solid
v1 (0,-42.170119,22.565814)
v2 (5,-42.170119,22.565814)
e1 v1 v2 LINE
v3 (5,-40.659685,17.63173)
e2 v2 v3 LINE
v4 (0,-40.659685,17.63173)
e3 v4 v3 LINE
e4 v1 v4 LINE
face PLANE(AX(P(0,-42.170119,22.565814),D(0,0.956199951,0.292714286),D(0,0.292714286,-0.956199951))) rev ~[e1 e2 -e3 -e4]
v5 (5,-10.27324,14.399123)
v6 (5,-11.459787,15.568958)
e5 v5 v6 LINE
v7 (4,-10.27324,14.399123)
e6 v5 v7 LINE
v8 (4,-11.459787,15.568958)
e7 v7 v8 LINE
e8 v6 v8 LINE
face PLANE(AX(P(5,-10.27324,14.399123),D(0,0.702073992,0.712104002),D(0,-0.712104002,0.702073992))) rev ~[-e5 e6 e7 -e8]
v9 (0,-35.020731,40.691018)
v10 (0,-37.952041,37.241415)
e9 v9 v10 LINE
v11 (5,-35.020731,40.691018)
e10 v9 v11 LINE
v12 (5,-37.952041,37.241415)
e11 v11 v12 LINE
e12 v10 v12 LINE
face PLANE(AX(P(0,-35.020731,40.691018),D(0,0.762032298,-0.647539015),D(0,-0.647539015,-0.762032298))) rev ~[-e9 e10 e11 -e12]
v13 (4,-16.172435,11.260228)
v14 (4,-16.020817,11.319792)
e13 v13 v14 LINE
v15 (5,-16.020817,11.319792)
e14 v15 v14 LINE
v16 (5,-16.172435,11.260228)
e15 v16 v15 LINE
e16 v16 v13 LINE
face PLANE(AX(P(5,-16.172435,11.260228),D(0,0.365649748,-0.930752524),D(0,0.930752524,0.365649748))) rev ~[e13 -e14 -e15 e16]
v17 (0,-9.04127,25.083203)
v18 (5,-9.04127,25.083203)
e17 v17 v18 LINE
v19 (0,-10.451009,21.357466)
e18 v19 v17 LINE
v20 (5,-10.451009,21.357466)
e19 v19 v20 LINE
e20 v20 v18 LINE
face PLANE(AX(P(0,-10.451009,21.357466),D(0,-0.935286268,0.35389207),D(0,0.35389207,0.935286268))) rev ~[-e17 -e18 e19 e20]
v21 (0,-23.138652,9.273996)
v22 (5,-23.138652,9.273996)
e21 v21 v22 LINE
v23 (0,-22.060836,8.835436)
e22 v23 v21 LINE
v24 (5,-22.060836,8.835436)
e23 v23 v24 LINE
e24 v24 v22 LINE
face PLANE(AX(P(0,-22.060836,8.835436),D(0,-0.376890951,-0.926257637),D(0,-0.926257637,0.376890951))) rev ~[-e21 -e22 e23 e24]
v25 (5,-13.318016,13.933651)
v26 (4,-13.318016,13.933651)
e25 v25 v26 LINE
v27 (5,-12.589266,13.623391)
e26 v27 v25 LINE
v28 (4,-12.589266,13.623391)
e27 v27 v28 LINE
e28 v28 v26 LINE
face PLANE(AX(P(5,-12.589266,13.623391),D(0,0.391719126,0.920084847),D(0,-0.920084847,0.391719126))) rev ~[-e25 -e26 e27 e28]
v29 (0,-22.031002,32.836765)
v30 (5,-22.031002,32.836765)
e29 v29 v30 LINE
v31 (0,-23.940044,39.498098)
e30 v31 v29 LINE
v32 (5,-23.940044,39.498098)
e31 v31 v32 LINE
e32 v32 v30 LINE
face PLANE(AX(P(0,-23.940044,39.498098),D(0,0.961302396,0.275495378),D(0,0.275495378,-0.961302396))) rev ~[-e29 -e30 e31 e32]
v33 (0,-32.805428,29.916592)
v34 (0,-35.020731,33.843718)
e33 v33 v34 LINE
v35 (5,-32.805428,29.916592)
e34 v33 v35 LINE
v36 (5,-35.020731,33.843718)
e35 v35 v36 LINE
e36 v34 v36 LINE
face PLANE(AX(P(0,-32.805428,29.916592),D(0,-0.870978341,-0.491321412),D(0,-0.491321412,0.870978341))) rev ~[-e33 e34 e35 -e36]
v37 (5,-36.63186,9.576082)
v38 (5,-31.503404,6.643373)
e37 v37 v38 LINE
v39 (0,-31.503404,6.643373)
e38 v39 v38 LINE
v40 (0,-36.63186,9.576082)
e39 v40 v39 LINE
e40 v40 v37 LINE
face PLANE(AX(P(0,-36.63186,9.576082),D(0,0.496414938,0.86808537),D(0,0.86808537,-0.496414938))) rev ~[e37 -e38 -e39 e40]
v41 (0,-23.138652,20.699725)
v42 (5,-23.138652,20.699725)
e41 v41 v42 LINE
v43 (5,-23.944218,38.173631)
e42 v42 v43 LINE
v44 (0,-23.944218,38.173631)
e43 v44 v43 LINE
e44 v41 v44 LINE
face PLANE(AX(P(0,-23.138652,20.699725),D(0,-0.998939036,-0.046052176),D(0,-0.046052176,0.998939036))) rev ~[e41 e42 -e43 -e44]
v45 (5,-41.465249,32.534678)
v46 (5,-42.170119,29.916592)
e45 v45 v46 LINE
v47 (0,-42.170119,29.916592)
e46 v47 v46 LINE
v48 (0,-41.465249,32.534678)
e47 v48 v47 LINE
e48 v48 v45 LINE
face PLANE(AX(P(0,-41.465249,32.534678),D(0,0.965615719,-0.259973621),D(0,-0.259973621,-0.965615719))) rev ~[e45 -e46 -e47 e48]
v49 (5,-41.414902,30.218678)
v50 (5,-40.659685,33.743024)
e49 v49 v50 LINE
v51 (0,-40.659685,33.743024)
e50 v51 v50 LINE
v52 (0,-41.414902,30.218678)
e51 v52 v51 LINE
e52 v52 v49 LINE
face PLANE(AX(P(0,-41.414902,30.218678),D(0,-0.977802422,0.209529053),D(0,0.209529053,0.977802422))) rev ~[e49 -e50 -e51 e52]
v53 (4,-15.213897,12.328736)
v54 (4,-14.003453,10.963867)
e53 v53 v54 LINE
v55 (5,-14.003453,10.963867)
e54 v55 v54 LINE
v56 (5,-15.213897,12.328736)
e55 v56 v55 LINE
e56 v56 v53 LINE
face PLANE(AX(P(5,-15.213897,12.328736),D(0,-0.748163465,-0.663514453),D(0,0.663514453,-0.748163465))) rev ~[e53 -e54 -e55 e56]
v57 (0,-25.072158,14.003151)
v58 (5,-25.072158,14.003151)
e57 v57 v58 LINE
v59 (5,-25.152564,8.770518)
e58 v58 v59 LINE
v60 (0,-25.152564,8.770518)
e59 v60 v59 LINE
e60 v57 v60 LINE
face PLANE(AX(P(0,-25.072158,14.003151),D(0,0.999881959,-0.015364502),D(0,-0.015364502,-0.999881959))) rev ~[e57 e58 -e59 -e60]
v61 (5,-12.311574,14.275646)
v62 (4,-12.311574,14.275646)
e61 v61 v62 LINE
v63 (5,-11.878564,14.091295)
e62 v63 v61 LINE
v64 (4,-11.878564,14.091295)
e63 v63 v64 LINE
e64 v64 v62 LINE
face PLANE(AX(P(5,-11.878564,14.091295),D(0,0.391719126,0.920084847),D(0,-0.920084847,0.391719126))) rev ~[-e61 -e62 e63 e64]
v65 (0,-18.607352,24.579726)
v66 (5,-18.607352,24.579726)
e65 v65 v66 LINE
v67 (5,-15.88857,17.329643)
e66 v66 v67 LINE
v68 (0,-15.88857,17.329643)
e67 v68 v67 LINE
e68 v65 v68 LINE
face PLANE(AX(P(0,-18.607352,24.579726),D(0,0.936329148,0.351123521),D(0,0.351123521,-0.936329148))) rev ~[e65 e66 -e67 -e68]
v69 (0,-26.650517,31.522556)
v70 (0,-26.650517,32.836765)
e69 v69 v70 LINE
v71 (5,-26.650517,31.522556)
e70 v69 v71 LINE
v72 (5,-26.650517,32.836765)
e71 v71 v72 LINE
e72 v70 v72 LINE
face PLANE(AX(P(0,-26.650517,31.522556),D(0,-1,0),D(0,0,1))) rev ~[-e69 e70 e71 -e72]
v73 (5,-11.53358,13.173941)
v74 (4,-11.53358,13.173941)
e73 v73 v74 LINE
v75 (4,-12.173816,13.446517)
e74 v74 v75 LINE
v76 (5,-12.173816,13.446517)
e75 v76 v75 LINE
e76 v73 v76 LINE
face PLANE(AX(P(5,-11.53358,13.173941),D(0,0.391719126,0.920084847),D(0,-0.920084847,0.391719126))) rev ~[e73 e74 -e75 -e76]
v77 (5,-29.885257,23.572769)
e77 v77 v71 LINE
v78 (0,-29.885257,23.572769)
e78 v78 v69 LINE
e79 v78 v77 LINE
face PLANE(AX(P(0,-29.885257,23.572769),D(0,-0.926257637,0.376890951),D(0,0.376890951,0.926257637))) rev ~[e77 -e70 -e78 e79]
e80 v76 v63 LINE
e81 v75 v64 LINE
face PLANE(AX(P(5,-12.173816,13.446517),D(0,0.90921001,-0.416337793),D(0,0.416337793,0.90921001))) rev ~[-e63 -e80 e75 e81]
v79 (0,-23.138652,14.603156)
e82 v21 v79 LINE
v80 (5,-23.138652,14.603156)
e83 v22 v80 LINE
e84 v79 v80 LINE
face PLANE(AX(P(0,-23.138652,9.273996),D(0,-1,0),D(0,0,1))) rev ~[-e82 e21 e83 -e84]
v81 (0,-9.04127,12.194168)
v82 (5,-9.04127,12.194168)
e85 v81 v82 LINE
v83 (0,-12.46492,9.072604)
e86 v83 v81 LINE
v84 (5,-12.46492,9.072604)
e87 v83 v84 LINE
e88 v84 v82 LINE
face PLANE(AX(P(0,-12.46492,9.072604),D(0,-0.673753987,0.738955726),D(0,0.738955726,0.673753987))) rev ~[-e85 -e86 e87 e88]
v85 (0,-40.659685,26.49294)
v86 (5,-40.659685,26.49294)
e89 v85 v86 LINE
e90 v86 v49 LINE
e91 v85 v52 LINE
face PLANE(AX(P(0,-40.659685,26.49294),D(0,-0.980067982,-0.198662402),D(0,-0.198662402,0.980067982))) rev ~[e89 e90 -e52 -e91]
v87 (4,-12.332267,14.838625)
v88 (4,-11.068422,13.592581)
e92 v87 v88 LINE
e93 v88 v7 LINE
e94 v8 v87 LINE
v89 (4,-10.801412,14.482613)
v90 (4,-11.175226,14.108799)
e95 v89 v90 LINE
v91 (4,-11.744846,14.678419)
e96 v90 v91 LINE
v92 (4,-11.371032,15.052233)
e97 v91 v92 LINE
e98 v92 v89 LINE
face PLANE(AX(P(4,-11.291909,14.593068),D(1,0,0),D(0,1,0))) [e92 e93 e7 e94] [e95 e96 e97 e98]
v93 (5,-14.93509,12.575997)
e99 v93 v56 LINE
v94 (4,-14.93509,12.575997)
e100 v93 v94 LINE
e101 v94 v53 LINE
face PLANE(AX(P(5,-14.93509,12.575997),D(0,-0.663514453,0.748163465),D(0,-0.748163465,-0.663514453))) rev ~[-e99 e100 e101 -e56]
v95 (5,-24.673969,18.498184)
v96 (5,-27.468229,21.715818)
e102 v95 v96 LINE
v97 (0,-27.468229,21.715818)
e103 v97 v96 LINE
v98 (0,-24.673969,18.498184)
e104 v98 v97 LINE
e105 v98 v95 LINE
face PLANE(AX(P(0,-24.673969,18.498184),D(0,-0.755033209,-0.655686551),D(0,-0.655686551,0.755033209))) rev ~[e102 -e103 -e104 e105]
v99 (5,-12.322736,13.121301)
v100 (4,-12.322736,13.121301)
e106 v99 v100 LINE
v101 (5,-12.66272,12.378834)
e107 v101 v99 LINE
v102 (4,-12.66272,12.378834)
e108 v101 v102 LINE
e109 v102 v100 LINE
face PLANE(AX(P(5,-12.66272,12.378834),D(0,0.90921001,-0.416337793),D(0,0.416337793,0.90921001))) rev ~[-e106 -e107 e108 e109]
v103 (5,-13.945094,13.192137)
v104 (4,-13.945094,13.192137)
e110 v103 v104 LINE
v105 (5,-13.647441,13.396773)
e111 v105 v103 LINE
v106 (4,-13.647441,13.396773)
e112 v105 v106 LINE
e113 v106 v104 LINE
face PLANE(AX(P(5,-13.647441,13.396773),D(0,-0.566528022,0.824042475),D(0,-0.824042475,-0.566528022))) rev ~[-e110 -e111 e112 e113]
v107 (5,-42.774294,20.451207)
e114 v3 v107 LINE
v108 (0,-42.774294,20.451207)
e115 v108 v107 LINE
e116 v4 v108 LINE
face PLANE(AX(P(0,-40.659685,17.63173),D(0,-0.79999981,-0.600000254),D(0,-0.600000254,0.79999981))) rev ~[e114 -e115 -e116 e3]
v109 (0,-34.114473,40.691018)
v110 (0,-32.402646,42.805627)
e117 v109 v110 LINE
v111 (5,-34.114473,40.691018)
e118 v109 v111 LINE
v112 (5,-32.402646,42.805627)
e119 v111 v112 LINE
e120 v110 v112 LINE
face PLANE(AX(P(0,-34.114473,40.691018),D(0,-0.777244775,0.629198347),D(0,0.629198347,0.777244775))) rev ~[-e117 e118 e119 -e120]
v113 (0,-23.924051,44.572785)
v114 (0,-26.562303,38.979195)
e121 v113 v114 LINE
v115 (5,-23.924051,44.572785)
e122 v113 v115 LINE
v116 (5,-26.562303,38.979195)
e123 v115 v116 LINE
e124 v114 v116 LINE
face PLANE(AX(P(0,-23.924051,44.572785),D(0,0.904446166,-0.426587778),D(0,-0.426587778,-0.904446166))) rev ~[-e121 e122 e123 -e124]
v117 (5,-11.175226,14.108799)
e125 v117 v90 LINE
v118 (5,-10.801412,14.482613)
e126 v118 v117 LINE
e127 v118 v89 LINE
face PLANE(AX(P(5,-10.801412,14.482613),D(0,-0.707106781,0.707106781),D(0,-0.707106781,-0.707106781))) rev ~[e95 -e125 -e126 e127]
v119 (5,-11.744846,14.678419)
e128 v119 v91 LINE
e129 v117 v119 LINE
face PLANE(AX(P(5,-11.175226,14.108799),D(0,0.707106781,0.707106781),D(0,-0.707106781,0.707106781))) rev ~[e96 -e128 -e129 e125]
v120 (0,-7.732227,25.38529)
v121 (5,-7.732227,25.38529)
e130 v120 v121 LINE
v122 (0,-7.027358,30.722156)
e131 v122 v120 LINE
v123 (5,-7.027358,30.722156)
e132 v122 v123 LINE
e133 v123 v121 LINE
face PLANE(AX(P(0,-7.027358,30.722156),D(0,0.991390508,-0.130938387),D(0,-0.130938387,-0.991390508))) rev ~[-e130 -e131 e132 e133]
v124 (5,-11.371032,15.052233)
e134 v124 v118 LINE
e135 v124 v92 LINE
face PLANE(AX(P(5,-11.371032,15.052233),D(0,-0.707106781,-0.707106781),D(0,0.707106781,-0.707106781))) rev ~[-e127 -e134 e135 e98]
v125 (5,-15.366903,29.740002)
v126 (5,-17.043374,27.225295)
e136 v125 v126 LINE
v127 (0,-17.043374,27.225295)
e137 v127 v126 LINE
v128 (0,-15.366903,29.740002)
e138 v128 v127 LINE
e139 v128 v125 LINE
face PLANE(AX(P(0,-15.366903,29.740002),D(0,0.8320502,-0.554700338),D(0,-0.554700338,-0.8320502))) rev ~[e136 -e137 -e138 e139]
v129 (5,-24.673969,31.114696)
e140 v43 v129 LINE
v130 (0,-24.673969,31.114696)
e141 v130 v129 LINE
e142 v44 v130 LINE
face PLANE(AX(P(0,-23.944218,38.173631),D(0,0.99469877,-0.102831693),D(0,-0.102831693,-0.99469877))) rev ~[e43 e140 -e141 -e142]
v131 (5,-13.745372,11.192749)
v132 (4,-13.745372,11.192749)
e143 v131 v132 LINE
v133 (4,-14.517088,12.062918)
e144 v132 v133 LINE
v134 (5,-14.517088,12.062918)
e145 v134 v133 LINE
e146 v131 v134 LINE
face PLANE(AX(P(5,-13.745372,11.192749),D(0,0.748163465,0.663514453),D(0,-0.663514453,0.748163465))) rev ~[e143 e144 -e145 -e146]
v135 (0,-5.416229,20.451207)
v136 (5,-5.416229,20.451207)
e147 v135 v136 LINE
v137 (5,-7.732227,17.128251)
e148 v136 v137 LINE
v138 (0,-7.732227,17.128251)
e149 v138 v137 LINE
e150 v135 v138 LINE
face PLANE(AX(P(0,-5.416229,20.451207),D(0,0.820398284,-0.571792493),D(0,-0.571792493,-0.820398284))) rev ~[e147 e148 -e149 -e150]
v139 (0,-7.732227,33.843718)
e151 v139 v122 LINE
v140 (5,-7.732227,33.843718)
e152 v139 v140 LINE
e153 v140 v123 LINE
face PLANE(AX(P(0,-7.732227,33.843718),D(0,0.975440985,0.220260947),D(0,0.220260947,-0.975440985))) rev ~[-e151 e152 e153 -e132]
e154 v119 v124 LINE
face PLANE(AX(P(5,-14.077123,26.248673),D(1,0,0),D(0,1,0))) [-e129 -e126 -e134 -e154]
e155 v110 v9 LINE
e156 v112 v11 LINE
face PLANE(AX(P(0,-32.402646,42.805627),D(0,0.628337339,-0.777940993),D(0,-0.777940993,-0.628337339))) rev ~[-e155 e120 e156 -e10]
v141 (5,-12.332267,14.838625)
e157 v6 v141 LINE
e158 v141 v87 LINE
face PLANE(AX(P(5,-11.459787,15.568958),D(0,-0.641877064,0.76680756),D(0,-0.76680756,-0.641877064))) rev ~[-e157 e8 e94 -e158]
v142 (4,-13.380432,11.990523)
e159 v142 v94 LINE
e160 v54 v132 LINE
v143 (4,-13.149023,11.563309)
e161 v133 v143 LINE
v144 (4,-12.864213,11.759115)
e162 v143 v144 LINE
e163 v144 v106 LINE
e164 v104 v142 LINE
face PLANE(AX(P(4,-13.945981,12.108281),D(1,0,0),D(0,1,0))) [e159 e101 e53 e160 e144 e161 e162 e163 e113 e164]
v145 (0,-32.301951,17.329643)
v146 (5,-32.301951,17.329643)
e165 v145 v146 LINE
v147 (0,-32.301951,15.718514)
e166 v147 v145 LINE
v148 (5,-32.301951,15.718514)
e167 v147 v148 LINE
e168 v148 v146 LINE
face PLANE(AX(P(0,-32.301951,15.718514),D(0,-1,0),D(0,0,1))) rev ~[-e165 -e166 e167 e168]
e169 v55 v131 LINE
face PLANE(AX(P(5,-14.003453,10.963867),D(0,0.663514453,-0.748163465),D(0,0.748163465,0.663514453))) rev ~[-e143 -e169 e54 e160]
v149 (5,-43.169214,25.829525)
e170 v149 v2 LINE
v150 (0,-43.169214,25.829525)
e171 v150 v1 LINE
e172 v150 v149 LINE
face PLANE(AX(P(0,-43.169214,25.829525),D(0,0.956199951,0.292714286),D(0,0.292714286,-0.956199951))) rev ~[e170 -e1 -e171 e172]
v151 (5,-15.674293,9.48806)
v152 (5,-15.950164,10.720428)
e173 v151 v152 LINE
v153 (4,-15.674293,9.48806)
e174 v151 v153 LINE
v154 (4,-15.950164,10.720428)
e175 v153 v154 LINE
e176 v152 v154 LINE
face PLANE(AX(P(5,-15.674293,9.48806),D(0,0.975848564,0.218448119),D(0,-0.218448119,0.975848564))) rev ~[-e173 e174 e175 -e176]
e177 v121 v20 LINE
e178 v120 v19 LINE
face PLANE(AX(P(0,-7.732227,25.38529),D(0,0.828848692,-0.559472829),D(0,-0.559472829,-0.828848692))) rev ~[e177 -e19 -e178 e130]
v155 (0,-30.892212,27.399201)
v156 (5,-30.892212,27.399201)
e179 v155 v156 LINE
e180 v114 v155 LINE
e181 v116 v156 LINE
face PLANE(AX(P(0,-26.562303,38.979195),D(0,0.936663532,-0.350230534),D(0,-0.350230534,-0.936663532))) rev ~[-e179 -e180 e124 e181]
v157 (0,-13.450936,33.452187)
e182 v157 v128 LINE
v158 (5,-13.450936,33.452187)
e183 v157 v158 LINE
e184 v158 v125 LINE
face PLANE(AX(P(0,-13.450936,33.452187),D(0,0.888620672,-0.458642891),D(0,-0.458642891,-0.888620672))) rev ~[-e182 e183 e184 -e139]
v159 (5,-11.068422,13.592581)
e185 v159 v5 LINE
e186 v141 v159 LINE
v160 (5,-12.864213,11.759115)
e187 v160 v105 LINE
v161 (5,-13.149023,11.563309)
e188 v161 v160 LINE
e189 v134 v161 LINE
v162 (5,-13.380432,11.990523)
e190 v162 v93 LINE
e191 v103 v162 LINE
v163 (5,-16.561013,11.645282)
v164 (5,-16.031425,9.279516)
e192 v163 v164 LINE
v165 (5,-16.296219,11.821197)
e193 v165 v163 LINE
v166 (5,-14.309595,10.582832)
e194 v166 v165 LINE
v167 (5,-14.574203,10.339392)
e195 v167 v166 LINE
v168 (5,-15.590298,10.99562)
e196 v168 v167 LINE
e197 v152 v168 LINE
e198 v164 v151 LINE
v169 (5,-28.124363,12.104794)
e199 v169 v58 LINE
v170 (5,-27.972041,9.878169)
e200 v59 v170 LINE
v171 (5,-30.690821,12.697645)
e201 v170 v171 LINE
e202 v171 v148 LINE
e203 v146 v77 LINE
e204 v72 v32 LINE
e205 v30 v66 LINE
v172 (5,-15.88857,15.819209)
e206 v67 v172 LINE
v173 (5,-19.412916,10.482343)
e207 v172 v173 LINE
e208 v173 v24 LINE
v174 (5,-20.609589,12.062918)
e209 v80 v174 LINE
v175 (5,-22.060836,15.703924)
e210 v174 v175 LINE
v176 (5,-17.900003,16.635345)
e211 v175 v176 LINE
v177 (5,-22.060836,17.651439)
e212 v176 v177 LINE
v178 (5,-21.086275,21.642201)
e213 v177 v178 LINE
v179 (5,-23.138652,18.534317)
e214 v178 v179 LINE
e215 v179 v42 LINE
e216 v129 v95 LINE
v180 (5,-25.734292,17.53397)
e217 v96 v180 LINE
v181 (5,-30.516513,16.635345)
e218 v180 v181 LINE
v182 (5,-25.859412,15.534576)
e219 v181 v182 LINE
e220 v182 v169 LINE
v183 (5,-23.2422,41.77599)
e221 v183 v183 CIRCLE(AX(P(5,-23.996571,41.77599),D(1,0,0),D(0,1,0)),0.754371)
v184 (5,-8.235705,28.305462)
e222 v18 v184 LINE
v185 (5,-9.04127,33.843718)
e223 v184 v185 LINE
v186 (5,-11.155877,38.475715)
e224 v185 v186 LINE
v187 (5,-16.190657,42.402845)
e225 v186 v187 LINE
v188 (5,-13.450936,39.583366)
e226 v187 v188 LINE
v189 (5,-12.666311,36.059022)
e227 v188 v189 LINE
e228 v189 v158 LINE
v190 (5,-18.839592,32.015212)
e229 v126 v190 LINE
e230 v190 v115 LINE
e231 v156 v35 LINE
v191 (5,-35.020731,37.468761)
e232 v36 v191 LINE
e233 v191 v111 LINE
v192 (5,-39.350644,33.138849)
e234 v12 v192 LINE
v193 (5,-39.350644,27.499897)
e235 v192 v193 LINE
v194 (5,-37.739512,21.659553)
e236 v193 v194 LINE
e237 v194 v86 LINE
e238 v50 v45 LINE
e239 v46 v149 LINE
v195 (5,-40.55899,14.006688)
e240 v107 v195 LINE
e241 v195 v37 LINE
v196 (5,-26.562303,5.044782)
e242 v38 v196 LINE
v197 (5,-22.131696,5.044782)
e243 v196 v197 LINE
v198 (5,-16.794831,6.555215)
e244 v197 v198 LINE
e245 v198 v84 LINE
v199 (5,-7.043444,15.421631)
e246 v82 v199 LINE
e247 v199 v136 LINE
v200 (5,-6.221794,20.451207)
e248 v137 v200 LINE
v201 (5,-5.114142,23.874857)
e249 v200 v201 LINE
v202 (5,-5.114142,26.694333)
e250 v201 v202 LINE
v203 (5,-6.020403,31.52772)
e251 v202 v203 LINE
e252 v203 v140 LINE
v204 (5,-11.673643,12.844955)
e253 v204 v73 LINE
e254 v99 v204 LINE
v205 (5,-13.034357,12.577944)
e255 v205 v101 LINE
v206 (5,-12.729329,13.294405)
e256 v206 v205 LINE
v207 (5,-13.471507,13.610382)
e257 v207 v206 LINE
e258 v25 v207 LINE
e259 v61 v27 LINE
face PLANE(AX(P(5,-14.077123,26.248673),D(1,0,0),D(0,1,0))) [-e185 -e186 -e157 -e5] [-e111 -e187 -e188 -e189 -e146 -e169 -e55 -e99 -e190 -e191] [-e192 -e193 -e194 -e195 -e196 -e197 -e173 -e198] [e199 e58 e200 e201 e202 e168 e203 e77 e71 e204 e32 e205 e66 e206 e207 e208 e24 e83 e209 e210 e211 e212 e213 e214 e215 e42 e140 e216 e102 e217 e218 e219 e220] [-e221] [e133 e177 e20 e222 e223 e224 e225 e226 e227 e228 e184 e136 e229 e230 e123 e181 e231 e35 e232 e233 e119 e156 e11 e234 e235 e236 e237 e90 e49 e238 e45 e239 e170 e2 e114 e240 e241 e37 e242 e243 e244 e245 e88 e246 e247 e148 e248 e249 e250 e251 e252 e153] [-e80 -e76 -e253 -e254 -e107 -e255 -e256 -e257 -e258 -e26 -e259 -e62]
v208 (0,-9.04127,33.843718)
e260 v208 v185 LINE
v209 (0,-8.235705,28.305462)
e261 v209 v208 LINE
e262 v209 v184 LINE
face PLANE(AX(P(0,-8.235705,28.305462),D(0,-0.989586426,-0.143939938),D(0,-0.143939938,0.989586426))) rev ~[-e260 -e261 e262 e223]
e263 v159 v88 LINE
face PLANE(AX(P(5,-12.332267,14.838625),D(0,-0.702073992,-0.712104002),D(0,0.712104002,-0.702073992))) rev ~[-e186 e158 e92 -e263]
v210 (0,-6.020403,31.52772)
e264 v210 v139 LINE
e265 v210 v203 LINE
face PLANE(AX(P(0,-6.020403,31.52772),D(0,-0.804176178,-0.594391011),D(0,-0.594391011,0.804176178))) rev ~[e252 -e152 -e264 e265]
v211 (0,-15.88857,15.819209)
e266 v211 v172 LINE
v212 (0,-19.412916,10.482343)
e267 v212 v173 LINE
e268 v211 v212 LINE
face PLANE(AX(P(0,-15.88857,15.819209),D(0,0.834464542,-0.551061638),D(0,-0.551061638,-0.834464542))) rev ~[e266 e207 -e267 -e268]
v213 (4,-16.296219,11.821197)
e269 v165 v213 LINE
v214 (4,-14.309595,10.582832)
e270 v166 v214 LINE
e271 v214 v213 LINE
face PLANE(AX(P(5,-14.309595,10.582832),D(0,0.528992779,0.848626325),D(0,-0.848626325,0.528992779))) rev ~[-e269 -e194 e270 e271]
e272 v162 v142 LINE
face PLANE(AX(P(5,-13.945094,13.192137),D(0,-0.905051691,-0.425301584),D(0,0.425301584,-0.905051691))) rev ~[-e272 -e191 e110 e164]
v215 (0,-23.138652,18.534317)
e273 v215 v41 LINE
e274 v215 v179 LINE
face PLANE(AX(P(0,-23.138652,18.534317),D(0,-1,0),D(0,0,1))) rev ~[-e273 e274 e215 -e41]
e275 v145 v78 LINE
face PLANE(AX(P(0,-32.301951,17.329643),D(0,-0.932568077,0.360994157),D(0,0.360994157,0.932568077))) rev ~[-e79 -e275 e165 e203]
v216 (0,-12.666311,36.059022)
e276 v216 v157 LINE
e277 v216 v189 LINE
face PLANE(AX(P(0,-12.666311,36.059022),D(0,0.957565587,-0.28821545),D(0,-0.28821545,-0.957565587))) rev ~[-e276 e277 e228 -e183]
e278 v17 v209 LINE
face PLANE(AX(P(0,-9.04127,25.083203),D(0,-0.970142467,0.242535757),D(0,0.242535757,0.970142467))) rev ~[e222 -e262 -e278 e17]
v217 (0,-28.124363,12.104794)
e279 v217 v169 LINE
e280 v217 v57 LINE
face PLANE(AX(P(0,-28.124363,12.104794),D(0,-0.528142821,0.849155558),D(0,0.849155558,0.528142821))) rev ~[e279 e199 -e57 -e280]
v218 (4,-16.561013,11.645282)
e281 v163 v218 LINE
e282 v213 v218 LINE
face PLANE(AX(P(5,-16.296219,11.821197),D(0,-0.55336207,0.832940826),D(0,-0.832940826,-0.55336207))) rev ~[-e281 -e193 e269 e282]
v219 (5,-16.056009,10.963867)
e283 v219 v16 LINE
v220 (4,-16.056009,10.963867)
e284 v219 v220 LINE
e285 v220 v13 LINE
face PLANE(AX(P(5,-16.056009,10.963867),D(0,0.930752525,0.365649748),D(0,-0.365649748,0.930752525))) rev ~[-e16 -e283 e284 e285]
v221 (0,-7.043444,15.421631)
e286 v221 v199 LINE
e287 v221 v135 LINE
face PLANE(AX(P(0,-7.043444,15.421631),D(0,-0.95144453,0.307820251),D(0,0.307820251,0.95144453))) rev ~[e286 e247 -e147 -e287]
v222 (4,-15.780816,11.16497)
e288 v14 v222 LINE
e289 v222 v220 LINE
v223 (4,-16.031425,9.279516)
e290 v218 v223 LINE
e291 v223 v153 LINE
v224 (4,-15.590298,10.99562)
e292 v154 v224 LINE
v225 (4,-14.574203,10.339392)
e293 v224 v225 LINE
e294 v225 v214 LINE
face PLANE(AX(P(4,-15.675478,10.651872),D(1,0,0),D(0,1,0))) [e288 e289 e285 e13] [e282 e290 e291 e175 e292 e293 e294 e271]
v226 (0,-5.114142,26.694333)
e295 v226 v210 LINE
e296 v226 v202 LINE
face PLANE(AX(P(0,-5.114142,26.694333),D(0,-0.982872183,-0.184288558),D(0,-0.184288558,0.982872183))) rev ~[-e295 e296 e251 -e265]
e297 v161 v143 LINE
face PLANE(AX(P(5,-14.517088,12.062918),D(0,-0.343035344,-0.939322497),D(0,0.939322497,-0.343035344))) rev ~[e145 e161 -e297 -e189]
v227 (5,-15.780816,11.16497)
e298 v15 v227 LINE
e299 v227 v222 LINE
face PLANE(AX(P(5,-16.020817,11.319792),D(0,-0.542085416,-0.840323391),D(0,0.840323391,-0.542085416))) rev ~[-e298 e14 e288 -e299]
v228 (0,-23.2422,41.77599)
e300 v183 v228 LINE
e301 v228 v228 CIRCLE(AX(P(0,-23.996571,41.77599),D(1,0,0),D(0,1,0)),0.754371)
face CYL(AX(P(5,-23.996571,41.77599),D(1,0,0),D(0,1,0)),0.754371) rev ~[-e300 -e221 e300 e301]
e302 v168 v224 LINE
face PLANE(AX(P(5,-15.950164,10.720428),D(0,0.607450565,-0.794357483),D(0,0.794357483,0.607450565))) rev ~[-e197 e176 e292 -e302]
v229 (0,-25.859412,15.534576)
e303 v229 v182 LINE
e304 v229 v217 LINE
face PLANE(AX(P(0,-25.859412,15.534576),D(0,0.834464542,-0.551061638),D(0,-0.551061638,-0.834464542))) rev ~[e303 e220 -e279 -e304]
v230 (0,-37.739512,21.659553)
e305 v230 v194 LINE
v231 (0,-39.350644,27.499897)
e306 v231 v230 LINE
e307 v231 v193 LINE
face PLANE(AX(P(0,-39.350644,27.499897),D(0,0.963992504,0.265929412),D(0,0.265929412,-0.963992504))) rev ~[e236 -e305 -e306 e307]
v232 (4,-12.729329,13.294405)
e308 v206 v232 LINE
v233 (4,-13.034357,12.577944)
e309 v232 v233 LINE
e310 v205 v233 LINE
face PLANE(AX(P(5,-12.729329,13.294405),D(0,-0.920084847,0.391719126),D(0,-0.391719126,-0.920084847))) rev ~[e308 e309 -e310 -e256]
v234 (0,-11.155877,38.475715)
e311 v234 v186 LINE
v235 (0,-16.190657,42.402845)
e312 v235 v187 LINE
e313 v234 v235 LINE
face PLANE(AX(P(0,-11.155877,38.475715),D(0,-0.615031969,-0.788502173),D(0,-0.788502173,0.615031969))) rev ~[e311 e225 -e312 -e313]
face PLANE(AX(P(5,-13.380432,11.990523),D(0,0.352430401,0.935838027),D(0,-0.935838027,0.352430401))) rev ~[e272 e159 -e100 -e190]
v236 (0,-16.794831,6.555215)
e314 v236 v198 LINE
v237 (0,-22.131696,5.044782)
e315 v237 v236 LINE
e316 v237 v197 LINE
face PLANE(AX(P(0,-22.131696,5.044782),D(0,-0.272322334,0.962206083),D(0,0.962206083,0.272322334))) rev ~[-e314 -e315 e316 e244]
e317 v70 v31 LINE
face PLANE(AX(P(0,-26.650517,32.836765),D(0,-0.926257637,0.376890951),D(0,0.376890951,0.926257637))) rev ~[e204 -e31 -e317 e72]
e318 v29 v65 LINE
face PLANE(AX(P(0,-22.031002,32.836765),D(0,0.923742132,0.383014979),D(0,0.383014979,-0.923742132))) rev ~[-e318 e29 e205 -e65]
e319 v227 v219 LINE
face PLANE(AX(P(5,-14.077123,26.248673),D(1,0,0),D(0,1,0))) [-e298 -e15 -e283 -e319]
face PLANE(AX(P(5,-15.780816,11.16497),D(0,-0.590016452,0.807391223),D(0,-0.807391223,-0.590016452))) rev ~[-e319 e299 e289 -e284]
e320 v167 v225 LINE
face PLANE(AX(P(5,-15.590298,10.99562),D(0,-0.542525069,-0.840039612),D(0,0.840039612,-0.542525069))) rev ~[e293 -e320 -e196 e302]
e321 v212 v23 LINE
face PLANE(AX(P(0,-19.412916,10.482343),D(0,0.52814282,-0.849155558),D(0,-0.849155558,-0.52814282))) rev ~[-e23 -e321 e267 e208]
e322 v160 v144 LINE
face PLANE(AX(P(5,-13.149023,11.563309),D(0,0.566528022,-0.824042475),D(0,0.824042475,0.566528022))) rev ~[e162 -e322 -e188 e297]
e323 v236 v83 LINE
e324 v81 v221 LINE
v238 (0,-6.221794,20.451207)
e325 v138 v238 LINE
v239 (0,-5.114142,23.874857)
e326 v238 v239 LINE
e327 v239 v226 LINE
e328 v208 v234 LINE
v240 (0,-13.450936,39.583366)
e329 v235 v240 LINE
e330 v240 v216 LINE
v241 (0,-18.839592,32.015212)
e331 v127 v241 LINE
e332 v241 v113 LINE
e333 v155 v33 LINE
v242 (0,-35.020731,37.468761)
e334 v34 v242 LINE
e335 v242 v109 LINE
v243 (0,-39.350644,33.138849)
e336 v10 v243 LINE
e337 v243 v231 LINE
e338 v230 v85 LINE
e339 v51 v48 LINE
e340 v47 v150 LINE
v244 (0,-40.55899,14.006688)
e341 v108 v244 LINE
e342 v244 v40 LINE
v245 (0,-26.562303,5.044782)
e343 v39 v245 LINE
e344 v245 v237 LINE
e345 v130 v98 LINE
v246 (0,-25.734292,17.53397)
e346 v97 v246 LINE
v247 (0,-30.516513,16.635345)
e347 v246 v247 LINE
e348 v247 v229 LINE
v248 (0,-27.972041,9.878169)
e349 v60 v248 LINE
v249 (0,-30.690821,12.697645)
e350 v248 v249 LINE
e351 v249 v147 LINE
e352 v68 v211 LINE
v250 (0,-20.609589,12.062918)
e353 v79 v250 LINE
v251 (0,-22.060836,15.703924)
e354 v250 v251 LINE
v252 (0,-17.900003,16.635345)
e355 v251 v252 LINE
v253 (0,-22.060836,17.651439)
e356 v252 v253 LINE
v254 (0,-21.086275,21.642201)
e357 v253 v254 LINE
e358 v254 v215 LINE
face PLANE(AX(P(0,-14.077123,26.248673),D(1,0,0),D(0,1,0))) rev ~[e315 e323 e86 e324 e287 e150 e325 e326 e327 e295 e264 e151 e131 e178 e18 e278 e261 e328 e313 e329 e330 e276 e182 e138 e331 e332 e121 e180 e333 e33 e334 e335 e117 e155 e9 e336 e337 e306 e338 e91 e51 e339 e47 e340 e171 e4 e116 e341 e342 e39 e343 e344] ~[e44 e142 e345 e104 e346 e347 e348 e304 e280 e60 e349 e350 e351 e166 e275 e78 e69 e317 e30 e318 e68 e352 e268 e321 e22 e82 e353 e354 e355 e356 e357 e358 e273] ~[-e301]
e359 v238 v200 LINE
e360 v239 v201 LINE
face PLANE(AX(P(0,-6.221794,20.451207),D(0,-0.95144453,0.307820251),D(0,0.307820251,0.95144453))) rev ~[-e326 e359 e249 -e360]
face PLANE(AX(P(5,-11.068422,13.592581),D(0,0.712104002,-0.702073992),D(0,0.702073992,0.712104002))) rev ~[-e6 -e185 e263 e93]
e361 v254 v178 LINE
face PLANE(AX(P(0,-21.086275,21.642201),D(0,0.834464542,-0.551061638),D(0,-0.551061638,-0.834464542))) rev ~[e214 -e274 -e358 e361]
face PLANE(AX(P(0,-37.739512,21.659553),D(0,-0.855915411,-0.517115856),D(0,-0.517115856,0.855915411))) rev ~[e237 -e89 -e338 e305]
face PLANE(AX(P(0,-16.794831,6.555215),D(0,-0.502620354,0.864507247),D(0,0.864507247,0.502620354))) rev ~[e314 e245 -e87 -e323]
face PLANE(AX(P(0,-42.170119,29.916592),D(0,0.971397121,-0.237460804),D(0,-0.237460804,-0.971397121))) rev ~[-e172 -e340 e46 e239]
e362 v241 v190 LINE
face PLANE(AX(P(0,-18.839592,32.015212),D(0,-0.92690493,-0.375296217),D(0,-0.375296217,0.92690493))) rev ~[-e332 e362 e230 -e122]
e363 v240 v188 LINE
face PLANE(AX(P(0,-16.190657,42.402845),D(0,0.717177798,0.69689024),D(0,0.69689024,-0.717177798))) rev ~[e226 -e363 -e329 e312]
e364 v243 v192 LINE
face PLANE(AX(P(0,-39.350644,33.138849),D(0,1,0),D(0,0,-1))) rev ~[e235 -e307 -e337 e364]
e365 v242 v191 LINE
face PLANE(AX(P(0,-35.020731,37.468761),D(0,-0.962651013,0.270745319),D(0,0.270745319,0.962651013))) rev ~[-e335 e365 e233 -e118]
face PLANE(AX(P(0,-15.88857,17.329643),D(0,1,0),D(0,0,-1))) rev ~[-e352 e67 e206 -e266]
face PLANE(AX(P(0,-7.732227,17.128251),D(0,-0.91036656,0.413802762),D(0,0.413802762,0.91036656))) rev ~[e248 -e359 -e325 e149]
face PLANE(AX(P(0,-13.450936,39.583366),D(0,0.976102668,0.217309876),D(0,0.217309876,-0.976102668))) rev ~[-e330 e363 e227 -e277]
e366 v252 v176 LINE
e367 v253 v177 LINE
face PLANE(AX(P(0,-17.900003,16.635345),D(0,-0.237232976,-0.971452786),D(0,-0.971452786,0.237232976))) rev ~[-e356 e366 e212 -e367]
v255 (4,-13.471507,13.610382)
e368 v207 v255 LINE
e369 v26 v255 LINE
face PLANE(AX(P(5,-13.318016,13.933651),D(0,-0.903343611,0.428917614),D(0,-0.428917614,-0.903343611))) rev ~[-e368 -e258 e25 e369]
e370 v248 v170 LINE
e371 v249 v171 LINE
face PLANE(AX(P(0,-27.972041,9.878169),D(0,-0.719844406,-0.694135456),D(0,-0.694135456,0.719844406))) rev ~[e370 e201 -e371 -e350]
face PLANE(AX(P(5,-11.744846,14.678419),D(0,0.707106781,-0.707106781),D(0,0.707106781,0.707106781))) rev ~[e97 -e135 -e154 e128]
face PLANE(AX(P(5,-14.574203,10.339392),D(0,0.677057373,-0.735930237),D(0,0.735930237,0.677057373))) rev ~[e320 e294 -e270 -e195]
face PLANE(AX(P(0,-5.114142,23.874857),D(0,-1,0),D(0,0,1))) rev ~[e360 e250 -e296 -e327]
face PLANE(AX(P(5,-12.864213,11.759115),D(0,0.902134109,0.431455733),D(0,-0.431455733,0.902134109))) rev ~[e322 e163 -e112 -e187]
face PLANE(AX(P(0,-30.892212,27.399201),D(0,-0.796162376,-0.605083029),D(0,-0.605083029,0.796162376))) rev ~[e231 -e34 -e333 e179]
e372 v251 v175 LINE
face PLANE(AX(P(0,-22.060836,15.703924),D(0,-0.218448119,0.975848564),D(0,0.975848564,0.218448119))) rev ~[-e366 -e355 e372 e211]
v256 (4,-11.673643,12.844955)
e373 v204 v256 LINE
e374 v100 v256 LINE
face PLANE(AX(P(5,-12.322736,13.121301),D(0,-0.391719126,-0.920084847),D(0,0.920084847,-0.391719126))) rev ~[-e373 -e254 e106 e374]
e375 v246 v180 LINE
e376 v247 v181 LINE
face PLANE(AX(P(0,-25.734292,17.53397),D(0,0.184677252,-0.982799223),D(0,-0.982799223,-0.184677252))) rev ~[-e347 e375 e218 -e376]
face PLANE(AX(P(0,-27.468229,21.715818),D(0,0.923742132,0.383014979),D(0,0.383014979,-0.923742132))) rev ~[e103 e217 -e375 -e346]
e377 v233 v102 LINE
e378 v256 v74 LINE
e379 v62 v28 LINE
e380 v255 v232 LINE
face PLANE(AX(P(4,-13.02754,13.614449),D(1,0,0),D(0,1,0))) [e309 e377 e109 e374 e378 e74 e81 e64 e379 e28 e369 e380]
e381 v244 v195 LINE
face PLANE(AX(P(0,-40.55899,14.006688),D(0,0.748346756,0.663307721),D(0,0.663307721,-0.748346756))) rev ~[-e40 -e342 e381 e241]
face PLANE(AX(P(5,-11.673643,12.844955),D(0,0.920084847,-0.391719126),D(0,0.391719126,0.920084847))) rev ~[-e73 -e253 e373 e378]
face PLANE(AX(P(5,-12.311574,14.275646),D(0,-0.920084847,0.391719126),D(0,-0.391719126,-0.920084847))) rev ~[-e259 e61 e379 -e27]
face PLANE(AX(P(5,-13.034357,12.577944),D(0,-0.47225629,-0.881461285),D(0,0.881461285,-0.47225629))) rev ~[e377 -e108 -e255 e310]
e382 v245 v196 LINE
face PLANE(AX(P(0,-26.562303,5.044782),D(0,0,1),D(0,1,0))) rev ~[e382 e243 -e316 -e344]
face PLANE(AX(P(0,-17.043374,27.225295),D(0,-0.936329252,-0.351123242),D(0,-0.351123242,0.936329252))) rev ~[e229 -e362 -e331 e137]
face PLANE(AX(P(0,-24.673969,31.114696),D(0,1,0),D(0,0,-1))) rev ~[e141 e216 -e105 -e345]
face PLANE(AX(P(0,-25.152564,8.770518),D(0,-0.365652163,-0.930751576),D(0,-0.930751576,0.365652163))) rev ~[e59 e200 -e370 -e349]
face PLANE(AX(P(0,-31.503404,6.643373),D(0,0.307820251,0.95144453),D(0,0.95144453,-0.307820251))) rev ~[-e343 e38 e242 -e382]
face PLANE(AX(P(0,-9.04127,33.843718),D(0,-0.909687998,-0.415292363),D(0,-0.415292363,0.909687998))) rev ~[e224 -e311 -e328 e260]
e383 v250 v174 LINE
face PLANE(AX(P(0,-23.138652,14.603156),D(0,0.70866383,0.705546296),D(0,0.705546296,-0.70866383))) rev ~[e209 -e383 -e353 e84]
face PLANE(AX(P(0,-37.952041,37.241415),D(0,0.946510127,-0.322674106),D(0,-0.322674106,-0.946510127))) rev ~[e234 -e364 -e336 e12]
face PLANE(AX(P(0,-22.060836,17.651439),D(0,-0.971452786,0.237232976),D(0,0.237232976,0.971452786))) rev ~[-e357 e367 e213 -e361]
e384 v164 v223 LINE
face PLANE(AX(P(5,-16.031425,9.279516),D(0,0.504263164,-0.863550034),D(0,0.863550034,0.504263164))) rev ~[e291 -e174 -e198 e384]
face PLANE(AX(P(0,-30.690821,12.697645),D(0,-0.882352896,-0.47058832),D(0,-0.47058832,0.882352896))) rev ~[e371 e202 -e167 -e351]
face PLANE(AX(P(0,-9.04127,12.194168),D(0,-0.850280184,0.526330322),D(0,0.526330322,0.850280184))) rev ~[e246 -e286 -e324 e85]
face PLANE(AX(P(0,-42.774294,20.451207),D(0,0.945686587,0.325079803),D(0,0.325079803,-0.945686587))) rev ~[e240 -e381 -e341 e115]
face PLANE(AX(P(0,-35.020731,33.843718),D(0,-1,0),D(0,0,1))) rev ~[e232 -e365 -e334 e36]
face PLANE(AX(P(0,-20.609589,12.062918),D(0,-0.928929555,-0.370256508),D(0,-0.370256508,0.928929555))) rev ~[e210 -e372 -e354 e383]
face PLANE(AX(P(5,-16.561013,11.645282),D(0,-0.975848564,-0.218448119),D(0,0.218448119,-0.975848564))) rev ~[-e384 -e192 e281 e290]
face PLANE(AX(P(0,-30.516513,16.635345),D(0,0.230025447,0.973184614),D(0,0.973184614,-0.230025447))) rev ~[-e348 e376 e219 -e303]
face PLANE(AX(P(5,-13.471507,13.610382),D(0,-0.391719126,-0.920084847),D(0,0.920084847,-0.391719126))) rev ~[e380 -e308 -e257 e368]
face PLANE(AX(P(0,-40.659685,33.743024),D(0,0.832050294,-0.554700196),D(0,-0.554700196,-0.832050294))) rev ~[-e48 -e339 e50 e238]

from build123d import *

# Parameters (mm, degrees)
F1_DEPTH = 5
F2_R     = 0.7543712854
F3_DEPTH = 5
F5_DEPTH = 1


# Not quite as in the source:
# - a feature names something its author has since deleted; it is built from what else it names


with BuildPart() as f1:
    # F0 (on Right) → F1 (new body)
    with BuildSketch(Plane.YZ):
        Polygon((-18.8395921141, 32.0152118802), (-23.9240508527, 44.5727854967), (-23.9400436678, 39.4980984787), (-22.0310017467, 32.8367650509), (-18.6073519289, 24.5797261596), (-15.8885698766, 17.3296425492), (-15.8885698766, 15.8192086965), (-19.4129161537, 10.4823429137), (-22.0608360687, 8.8354363138), (-22.1316963434, 5.0447816029), (-16.7948305607, 6.5552145243), (-12.4649200588, 9.0726036578), (-9.0412702411, 12.1941678226), (-7.0434443557, 15.421631052), (-5.4162289016, 20.4512067139), (-7.732226979, 17.128251493), (-6.221793592, 20.4512067139), (-5.1141423173, 23.8748565316), (-5.1141423173, 26.6943331808), (-6.0204025358, 31.5277203918), (-7.732226979, 33.8437184691), (-7.0273578167, 30.722156167), (-7.732226979, 25.3852903843), (-10.4510085657, 21.3574655354), (-9.0412702411, 25.0832028687), (-8.2357050851, 28.3054616302), (-9.0412702411, 33.8437184691), (-11.1558772624, 38.4757146239), (-16.1906573921, 42.4028448761), (-13.4509364143, 39.5833663642), (-12.666311115, 36.0590219498), (-13.4509364143, 33.4521867335), (-15.3669025749, 29.7400020063), (-17.0433744788, 27.2252950817), align=None)
        Polygon((-23.9400436678, 39.4980984787), (-23.9240508527, 44.5727854967), (-26.5623033047, 38.9791950583), (-30.8922119439, 27.3992009461), (-32.8054279089, 29.9165919423), (-35.0207313895, 33.8437184691), (-35.0207313895, 37.4687612057), (-34.114472568, 40.6910181046), (-32.4026457965, 42.8056269884), (-35.0207313895, 40.6910181046), (-37.9520406538, 37.2414154054), (-39.350643754, 33.1388488412), (-39.350643754, 27.4998974055), (-37.7395115793, 21.659553051), (-40.6596846879, 26.492940262), (-41.4149016142, 30.2186775953), (-40.6596846879, 33.7430238724), (-41.4652489126, 32.5346775353), (-42.1701185405, 29.9165919423), (-43.169213802, 25.8295247582), (-42.1701185405, 22.5658137351), (-40.6596846879, 17.6317300647), (-42.7742935717, 20.4512067139), (-40.5589900911, 14.0066882595), (-36.631859839, 9.5760822296), (-31.5034037335, 6.6433727204), (-26.5623033047, 5.0447816029), (-25.1525640488, 8.7705180049), (-27.9720406979, 9.8781688139), (-30.6908208877, 12.697645463), (-32.3019511998, 15.7185140997), (-32.3019511998, 17.3296425492), (-29.885256663, 23.572769016), (-26.6505166424, 31.5225556516), (-26.6505166424, 32.8367650509), align=None)
        Polygon((-22.1316963434, 5.0447816029), (-22.0608360687, 8.8354363138), (-23.1386516243, 9.2739956453), (-23.1386516243, 14.6031556651), (-25.0721577589, 14.0031509837), (-25.1525640488, 8.7705180049), (-26.5623033047, 5.0447816029), align=None)
        Polygon((-23.1386516243, 20.699724555), (-23.9442177117, 38.1736308336), (-24.6739685535, 31.1146955937), (-24.6739685535, 24.4254041463), (-24.6739685535, 18.4981841594), (-27.4682287127, 21.715817973), (-25.7342918677, 17.5339697332), (-30.516512692, 16.6353452951), (-25.8594118059, 15.5345760286), (-28.1243625509, 12.1047943952), (-25.0721577589, 14.0031509837), (-23.1386516243, 14.6031556651), (-20.6095892936, 12.0629183948), (-22.0608360687, 15.7039240003), (-17.9000031203, 16.6353452951), (-22.0608360687, 17.6514387131), (-21.0862746716, 21.6422008803), (-23.1386516243, 18.5343166173), align=None)
    extrude(amount=F1_DEPTH)

    # F2 (on face) → F3 (cut)
    with BuildSketch(Plane.YZ.offset(5)):
        with Locations((-23.9965710789, 41.7759902775)):
            Circle(F2_R)
    extrude(amount=-F3_DEPTH, mode=Mode.SUBTRACT)

    # F4 (on face) → F5 (cut)
    with BuildSketch(Plane.YZ.offset(5)):
        Polygon((-16.5610130304, 11.6452822793), (-16.0314254463, 9.2795155942), (-15.6742927399, 9.4880603932), (-15.9501638263, 10.7204280794), (-15.5902979895, 10.9956199303), (-14.5742027089, 10.3393923491), (-14.309595339, 10.5828316882), (-16.2962192383, 11.8211973459), align=None)
        Polygon((-15.7808158547, 11.1649697646), (-16.056008637, 10.9638674185), (-16.1724351346, 11.2602282315), (-16.0208165755, 11.319792172), align=None, mode=Mode.SUBTRACT)
        Polygon((-15.2138965204, 12.3287355527), (-14.0034528449, 10.9638674185), (-13.7453717467, 11.1927486014), (-14.5170884397, 12.0629183948), (-13.149023056, 11.563308537), (-12.8642125055, 11.759115383), (-13.6474408209, 13.3967734873), (-13.9450938452, 13.192137459), (-13.3804315701, 11.9905229658), (-14.9350901603, 12.5759970916), align=None)
        Polygon((-13.31801555, 13.93365104), (-13.4715074673, 13.610381633), (-12.7293292628, 13.2944049069), (-12.5892657792, 13.6233913674), align=None)
        Polygon((-12.5892657792, 13.6233913674), (-12.7293292628, 13.2944049069), (-12.3227360628, 13.1213009442), (-12.1738159695, 13.4465167705), align=None)
        Polygon((-12.3227360628, 13.1213009442), (-12.7293292628, 13.2944049069), (-13.0343568597, 12.5779444352), (-12.6627200979, 12.3788343877), align=None)
        Polygon((-12.1738159695, 13.4465167705), (-12.3227360628, 13.1213009442), (-11.6736432537, 12.8449546173), (-11.5335797702, 13.1739410778), align=None)
        Polygon((-12.3115735045, 14.2756455901), (-12.5892657792, 13.6233913674), (-12.1738159695, 13.4465167705), (-11.8785644276, 14.0912952688), align=None)
        Polygon((-11.4597871365, 15.568957784), (-12.3322671279, 14.8386247456), (-11.0684223473, 13.5925812647), (-10.2732402928, 14.3991234958), align=None)
        Polygon((-11.7448461242, 14.678419102), (-11.3710323349, 15.0522328913), (-10.8014121652, 14.4826127216), (-11.1752259545, 14.1087989323), align=None, mode=Mode.SUBTRACT)
    extrude(amount=-F5_DEPTH, mode=Mode.SUBTRACT)


solid = f1.part
